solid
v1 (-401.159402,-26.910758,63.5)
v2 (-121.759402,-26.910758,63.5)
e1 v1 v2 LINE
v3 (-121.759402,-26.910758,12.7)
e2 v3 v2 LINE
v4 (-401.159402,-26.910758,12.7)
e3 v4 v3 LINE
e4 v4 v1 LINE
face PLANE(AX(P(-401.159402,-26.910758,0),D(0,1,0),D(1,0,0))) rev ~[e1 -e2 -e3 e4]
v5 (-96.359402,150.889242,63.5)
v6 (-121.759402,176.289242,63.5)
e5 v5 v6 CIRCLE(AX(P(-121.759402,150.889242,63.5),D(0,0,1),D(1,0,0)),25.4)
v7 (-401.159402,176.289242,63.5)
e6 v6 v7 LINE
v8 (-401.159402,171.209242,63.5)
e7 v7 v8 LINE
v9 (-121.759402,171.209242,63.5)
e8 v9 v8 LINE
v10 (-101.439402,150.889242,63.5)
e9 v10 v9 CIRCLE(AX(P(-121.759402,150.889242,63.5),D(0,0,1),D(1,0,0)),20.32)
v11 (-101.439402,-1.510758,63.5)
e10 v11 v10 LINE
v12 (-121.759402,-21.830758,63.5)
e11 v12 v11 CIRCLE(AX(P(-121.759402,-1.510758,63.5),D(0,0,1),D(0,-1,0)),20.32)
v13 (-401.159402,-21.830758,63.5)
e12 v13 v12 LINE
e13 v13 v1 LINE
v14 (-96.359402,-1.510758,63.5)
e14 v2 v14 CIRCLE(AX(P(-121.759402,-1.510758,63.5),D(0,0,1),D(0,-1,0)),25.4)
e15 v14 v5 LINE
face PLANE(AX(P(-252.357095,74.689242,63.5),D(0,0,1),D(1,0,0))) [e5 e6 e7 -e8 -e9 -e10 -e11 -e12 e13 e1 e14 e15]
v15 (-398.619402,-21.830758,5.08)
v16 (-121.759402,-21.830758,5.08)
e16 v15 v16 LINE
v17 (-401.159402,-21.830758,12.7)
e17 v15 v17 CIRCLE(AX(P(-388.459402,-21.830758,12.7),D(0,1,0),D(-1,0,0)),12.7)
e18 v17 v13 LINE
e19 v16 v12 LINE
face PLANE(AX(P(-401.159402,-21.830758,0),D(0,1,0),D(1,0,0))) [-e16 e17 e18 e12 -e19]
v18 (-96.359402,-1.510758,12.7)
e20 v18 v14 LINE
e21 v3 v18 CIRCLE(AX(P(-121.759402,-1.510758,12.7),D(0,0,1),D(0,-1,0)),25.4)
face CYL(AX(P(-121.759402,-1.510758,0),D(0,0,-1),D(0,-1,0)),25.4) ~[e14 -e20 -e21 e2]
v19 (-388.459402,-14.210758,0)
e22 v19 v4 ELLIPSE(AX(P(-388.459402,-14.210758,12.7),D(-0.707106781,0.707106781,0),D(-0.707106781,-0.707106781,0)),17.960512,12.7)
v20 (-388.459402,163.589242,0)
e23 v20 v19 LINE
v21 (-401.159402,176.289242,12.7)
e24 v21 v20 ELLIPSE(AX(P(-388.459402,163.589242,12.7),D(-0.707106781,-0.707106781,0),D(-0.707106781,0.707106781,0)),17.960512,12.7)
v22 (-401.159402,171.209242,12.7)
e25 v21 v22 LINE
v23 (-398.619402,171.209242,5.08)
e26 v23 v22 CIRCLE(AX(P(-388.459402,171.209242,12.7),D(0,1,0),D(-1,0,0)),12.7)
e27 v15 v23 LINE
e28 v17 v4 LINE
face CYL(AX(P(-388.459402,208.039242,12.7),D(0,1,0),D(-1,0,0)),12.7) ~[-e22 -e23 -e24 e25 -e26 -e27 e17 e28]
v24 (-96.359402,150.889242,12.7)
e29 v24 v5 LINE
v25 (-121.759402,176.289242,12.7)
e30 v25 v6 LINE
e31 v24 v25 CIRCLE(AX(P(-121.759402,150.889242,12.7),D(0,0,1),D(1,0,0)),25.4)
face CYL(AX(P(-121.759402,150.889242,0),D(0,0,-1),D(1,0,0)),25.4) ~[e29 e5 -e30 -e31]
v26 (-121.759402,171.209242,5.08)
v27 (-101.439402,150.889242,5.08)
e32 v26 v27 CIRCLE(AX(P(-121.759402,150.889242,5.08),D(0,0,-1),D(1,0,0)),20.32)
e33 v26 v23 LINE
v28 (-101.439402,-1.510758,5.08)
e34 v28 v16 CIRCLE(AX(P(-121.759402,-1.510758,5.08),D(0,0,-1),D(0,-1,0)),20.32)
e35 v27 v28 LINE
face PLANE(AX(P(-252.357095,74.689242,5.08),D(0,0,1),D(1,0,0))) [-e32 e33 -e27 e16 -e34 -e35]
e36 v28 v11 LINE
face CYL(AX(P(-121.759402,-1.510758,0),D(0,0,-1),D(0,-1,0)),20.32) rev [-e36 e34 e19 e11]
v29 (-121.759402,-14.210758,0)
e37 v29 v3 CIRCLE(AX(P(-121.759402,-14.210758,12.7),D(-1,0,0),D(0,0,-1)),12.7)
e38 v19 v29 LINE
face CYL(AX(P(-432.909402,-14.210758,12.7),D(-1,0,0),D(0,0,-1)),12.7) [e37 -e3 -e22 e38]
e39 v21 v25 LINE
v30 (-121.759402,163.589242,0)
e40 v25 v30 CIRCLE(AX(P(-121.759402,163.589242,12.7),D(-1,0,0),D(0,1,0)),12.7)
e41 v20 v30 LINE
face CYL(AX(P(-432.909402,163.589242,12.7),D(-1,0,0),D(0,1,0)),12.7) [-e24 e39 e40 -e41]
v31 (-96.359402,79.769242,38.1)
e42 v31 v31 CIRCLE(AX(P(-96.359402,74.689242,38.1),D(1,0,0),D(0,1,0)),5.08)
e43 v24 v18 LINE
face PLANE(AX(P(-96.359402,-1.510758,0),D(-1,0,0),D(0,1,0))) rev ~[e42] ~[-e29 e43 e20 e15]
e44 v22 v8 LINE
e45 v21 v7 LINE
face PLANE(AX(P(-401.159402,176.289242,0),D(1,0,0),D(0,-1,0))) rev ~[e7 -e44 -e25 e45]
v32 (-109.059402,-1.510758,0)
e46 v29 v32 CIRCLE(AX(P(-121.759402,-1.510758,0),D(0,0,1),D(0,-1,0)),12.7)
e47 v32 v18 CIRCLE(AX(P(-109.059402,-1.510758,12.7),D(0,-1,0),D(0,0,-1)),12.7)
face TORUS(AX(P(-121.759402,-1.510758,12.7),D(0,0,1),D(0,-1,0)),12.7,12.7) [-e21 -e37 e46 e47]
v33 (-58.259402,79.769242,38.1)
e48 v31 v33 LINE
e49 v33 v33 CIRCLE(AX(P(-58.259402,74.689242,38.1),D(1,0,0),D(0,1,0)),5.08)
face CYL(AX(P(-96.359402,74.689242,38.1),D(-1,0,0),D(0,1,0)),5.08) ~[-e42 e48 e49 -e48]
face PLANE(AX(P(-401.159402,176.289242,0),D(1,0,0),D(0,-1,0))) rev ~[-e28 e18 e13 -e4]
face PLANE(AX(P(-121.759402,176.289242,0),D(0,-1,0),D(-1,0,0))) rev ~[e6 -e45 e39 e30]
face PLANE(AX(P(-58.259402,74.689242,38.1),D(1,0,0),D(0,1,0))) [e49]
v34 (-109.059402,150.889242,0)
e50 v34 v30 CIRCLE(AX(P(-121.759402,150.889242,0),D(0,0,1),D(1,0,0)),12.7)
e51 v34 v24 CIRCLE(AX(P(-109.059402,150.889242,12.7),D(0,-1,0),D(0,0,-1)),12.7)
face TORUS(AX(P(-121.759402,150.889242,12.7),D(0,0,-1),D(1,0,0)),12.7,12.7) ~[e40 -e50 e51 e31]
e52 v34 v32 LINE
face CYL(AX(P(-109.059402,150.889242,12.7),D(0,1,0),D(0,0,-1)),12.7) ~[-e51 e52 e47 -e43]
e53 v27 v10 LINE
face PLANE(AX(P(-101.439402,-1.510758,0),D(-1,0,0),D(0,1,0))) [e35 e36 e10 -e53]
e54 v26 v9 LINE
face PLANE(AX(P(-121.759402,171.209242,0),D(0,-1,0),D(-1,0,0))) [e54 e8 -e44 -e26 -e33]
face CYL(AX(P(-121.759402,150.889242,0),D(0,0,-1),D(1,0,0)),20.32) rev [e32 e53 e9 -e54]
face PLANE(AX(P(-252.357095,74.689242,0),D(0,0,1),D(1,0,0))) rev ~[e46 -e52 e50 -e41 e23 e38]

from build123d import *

# Parameters (mm, degrees)
F1_DEPTH     = 63.5
F2_T         = -5.08
F3_R         = 5.08
F4_DEPTH     = 38.1
F5_T1_DEPTH  = 311.15
F5_T3_DEPTH  = 266.7
F5_T5_DEPTH  = 152.4
F5_T8_ANGLE  = 90
F5_T10_ANGLE = 90


# Not quite as in the source:
# - a fillet or chamfer that OpenCascade refuses, or shapes differently, is made with other operations: its cross-section is extruded or revolved along the edge and cut away or added


with BuildPart() as f1:
    # F0 (on Top) → F1 (new body)
    with BuildSketch(Plane.XY):
        with BuildLine():
            Line((-344.2945734978, 176.2892417401), (-401.1594021572, 176.2892417401))
            Line((-401.1594021572, 176.2892417401), (-401.1594021572, -26.9107582599))
            Line((-401.1594021572, -26.9107582599), (-344.2945734978, -26.9107582599))
            Line((-344.2945734978, -26.9107582599), (-121.7594021572, -26.9107582599))
            ThreePointArc((-121.7594021572, -26.9107582599), (-103.7988899151, -19.471270502), (-96.3594021572, -1.5107582599))
            Line((-96.3594021572, -1.5107582599), (-96.3594021572, 6.5090437472))
            Line((-96.3594021572, 6.5090437472), (-96.3594021572, 44.6090437472))
            Line((-96.3594021572, 44.6090437472), (-96.3594021572, 150.8892417401))
            ThreePointArc((-96.3594021572, 150.8892417401), (-103.7988899151, 168.8497539822), (-121.7594021572, 176.2892417401))
            Line((-121.7594021572, 176.2892417401), (-344.2945734978, 176.2892417401))
        make_face()
    extrude(amount=F1_DEPTH)

    # F2
    f2_openings = [f1.faces().sort_by_distance(p)[0] for p in [
        (-249.418343, 74.689242, 63.5),
        (-401.159402, 74.689242, 31.75),
    ]]
    offset(amount=F2_T, openings=f2_openings)

    # F3 (on face) → F4 (join)
    with BuildSketch(Plane.YZ.offset(-96.3594021572)):
        with Locations((74.6892417401, 38.1)):
            Circle(F3_R)
    extrude(amount=F4_DEPTH)

    # F5: fillet of radius 12.7 on 6 edges, made by hand

    # F5_s2 → F5_t1 (cut)
    with BuildSketch(Plane.YZ.offset(-432.9094021572)):
        with BuildLine():
            ThreePointArc((176.2892417401, 12.7), (172.5694978612, 3.7197438789), (163.5892417401, 0))
            Line((163.5892417401, 0), (176.2892417401, 0))
            Line((176.2892417401, 0), (176.2892417401, 12.7))
        make_face()
        with BuildLine():
            ThreePointArc((-14.2107582599, 0), (-23.191014381, 3.7197438789), (-26.9107582599, 12.7))
            Line((-26.9107582599, 12.7), (-26.9107582599, 0))
            Line((-26.9107582599, 0), (-14.2107582599, 0))
        make_face()
    extrude(amount=F5_T1_DEPTH, mode=Mode.SUBTRACT)

    # F5_s4 → F5_t3 (cut)
    with BuildSketch(Plane.XZ.offset(-208.0392417401)):
        with BuildLine():
            ThreePointArc((-401.1594021572, 12.7), (-397.4396582783, 3.7197438789), (-388.4594021572, 0))
            Line((-388.4594021572, 0), (-401.1594021572, 0))
            Line((-401.1594021572, 0), (-401.1594021572, 12.7))
        make_face()
    extrude(amount=F5_T3_DEPTH, mode=Mode.SUBTRACT)

    # F5_s6 → F5_t5 (cut)
    with BuildSketch(Plane.XZ.offset(-150.8892417401)):
        with BuildLine():
            ThreePointArc((-109.0594021572, 0), (-100.0791460361, 3.7197438789), (-96.3594021572, 12.7))
            Line((-96.3594021572, 12.7), (-96.3594021572, 0))
            Line((-96.3594021572, 0), (-109.0594021572, 0))
        make_face()
    extrude(amount=F5_T5_DEPTH, mode=Mode.SUBTRACT)

    # F5_s7 → F5_t8 (revolve, cut)
    with BuildSketch(Plane.YZ.offset(-121.7594021572)):
        with BuildLine():
            ThreePointArc((-14.2107582599, 0), (-23.191014381, 3.7197438789), (-26.9107582599, 12.7))
            Line((-26.9107582599, 12.7), (-26.9107582599, 0))
            Line((-26.9107582599, 0), (-14.2107582599, 0))
        make_face()
    revolve(axis=Axis((-121.7594021572, -1.5107582599, 0), (0, 0, 1)), revolution_arc=F5_T8_ANGLE, mode=Mode.SUBTRACT)

    # F5_s9 → F5_t10 (revolve, cut)
    with BuildSketch(Plane.XZ.offset(-150.8892417401)):
        with BuildLine():
            ThreePointArc((-96.3594021572, 12.7), (-100.0791460361, 3.7197438789), (-109.0594021572, 0))
            Line((-109.0594021572, 0), (-96.3594021572, 0))
            Line((-96.3594021572, 0), (-96.3594021572, 12.7))
        make_face()
    revolve(axis=Axis((-121.7594021572, 150.8892417401, 0), (0, 0, 1)), revolution_arc=F5_T10_ANGLE, mode=Mode.SUBTRACT)


solid = f1.part
